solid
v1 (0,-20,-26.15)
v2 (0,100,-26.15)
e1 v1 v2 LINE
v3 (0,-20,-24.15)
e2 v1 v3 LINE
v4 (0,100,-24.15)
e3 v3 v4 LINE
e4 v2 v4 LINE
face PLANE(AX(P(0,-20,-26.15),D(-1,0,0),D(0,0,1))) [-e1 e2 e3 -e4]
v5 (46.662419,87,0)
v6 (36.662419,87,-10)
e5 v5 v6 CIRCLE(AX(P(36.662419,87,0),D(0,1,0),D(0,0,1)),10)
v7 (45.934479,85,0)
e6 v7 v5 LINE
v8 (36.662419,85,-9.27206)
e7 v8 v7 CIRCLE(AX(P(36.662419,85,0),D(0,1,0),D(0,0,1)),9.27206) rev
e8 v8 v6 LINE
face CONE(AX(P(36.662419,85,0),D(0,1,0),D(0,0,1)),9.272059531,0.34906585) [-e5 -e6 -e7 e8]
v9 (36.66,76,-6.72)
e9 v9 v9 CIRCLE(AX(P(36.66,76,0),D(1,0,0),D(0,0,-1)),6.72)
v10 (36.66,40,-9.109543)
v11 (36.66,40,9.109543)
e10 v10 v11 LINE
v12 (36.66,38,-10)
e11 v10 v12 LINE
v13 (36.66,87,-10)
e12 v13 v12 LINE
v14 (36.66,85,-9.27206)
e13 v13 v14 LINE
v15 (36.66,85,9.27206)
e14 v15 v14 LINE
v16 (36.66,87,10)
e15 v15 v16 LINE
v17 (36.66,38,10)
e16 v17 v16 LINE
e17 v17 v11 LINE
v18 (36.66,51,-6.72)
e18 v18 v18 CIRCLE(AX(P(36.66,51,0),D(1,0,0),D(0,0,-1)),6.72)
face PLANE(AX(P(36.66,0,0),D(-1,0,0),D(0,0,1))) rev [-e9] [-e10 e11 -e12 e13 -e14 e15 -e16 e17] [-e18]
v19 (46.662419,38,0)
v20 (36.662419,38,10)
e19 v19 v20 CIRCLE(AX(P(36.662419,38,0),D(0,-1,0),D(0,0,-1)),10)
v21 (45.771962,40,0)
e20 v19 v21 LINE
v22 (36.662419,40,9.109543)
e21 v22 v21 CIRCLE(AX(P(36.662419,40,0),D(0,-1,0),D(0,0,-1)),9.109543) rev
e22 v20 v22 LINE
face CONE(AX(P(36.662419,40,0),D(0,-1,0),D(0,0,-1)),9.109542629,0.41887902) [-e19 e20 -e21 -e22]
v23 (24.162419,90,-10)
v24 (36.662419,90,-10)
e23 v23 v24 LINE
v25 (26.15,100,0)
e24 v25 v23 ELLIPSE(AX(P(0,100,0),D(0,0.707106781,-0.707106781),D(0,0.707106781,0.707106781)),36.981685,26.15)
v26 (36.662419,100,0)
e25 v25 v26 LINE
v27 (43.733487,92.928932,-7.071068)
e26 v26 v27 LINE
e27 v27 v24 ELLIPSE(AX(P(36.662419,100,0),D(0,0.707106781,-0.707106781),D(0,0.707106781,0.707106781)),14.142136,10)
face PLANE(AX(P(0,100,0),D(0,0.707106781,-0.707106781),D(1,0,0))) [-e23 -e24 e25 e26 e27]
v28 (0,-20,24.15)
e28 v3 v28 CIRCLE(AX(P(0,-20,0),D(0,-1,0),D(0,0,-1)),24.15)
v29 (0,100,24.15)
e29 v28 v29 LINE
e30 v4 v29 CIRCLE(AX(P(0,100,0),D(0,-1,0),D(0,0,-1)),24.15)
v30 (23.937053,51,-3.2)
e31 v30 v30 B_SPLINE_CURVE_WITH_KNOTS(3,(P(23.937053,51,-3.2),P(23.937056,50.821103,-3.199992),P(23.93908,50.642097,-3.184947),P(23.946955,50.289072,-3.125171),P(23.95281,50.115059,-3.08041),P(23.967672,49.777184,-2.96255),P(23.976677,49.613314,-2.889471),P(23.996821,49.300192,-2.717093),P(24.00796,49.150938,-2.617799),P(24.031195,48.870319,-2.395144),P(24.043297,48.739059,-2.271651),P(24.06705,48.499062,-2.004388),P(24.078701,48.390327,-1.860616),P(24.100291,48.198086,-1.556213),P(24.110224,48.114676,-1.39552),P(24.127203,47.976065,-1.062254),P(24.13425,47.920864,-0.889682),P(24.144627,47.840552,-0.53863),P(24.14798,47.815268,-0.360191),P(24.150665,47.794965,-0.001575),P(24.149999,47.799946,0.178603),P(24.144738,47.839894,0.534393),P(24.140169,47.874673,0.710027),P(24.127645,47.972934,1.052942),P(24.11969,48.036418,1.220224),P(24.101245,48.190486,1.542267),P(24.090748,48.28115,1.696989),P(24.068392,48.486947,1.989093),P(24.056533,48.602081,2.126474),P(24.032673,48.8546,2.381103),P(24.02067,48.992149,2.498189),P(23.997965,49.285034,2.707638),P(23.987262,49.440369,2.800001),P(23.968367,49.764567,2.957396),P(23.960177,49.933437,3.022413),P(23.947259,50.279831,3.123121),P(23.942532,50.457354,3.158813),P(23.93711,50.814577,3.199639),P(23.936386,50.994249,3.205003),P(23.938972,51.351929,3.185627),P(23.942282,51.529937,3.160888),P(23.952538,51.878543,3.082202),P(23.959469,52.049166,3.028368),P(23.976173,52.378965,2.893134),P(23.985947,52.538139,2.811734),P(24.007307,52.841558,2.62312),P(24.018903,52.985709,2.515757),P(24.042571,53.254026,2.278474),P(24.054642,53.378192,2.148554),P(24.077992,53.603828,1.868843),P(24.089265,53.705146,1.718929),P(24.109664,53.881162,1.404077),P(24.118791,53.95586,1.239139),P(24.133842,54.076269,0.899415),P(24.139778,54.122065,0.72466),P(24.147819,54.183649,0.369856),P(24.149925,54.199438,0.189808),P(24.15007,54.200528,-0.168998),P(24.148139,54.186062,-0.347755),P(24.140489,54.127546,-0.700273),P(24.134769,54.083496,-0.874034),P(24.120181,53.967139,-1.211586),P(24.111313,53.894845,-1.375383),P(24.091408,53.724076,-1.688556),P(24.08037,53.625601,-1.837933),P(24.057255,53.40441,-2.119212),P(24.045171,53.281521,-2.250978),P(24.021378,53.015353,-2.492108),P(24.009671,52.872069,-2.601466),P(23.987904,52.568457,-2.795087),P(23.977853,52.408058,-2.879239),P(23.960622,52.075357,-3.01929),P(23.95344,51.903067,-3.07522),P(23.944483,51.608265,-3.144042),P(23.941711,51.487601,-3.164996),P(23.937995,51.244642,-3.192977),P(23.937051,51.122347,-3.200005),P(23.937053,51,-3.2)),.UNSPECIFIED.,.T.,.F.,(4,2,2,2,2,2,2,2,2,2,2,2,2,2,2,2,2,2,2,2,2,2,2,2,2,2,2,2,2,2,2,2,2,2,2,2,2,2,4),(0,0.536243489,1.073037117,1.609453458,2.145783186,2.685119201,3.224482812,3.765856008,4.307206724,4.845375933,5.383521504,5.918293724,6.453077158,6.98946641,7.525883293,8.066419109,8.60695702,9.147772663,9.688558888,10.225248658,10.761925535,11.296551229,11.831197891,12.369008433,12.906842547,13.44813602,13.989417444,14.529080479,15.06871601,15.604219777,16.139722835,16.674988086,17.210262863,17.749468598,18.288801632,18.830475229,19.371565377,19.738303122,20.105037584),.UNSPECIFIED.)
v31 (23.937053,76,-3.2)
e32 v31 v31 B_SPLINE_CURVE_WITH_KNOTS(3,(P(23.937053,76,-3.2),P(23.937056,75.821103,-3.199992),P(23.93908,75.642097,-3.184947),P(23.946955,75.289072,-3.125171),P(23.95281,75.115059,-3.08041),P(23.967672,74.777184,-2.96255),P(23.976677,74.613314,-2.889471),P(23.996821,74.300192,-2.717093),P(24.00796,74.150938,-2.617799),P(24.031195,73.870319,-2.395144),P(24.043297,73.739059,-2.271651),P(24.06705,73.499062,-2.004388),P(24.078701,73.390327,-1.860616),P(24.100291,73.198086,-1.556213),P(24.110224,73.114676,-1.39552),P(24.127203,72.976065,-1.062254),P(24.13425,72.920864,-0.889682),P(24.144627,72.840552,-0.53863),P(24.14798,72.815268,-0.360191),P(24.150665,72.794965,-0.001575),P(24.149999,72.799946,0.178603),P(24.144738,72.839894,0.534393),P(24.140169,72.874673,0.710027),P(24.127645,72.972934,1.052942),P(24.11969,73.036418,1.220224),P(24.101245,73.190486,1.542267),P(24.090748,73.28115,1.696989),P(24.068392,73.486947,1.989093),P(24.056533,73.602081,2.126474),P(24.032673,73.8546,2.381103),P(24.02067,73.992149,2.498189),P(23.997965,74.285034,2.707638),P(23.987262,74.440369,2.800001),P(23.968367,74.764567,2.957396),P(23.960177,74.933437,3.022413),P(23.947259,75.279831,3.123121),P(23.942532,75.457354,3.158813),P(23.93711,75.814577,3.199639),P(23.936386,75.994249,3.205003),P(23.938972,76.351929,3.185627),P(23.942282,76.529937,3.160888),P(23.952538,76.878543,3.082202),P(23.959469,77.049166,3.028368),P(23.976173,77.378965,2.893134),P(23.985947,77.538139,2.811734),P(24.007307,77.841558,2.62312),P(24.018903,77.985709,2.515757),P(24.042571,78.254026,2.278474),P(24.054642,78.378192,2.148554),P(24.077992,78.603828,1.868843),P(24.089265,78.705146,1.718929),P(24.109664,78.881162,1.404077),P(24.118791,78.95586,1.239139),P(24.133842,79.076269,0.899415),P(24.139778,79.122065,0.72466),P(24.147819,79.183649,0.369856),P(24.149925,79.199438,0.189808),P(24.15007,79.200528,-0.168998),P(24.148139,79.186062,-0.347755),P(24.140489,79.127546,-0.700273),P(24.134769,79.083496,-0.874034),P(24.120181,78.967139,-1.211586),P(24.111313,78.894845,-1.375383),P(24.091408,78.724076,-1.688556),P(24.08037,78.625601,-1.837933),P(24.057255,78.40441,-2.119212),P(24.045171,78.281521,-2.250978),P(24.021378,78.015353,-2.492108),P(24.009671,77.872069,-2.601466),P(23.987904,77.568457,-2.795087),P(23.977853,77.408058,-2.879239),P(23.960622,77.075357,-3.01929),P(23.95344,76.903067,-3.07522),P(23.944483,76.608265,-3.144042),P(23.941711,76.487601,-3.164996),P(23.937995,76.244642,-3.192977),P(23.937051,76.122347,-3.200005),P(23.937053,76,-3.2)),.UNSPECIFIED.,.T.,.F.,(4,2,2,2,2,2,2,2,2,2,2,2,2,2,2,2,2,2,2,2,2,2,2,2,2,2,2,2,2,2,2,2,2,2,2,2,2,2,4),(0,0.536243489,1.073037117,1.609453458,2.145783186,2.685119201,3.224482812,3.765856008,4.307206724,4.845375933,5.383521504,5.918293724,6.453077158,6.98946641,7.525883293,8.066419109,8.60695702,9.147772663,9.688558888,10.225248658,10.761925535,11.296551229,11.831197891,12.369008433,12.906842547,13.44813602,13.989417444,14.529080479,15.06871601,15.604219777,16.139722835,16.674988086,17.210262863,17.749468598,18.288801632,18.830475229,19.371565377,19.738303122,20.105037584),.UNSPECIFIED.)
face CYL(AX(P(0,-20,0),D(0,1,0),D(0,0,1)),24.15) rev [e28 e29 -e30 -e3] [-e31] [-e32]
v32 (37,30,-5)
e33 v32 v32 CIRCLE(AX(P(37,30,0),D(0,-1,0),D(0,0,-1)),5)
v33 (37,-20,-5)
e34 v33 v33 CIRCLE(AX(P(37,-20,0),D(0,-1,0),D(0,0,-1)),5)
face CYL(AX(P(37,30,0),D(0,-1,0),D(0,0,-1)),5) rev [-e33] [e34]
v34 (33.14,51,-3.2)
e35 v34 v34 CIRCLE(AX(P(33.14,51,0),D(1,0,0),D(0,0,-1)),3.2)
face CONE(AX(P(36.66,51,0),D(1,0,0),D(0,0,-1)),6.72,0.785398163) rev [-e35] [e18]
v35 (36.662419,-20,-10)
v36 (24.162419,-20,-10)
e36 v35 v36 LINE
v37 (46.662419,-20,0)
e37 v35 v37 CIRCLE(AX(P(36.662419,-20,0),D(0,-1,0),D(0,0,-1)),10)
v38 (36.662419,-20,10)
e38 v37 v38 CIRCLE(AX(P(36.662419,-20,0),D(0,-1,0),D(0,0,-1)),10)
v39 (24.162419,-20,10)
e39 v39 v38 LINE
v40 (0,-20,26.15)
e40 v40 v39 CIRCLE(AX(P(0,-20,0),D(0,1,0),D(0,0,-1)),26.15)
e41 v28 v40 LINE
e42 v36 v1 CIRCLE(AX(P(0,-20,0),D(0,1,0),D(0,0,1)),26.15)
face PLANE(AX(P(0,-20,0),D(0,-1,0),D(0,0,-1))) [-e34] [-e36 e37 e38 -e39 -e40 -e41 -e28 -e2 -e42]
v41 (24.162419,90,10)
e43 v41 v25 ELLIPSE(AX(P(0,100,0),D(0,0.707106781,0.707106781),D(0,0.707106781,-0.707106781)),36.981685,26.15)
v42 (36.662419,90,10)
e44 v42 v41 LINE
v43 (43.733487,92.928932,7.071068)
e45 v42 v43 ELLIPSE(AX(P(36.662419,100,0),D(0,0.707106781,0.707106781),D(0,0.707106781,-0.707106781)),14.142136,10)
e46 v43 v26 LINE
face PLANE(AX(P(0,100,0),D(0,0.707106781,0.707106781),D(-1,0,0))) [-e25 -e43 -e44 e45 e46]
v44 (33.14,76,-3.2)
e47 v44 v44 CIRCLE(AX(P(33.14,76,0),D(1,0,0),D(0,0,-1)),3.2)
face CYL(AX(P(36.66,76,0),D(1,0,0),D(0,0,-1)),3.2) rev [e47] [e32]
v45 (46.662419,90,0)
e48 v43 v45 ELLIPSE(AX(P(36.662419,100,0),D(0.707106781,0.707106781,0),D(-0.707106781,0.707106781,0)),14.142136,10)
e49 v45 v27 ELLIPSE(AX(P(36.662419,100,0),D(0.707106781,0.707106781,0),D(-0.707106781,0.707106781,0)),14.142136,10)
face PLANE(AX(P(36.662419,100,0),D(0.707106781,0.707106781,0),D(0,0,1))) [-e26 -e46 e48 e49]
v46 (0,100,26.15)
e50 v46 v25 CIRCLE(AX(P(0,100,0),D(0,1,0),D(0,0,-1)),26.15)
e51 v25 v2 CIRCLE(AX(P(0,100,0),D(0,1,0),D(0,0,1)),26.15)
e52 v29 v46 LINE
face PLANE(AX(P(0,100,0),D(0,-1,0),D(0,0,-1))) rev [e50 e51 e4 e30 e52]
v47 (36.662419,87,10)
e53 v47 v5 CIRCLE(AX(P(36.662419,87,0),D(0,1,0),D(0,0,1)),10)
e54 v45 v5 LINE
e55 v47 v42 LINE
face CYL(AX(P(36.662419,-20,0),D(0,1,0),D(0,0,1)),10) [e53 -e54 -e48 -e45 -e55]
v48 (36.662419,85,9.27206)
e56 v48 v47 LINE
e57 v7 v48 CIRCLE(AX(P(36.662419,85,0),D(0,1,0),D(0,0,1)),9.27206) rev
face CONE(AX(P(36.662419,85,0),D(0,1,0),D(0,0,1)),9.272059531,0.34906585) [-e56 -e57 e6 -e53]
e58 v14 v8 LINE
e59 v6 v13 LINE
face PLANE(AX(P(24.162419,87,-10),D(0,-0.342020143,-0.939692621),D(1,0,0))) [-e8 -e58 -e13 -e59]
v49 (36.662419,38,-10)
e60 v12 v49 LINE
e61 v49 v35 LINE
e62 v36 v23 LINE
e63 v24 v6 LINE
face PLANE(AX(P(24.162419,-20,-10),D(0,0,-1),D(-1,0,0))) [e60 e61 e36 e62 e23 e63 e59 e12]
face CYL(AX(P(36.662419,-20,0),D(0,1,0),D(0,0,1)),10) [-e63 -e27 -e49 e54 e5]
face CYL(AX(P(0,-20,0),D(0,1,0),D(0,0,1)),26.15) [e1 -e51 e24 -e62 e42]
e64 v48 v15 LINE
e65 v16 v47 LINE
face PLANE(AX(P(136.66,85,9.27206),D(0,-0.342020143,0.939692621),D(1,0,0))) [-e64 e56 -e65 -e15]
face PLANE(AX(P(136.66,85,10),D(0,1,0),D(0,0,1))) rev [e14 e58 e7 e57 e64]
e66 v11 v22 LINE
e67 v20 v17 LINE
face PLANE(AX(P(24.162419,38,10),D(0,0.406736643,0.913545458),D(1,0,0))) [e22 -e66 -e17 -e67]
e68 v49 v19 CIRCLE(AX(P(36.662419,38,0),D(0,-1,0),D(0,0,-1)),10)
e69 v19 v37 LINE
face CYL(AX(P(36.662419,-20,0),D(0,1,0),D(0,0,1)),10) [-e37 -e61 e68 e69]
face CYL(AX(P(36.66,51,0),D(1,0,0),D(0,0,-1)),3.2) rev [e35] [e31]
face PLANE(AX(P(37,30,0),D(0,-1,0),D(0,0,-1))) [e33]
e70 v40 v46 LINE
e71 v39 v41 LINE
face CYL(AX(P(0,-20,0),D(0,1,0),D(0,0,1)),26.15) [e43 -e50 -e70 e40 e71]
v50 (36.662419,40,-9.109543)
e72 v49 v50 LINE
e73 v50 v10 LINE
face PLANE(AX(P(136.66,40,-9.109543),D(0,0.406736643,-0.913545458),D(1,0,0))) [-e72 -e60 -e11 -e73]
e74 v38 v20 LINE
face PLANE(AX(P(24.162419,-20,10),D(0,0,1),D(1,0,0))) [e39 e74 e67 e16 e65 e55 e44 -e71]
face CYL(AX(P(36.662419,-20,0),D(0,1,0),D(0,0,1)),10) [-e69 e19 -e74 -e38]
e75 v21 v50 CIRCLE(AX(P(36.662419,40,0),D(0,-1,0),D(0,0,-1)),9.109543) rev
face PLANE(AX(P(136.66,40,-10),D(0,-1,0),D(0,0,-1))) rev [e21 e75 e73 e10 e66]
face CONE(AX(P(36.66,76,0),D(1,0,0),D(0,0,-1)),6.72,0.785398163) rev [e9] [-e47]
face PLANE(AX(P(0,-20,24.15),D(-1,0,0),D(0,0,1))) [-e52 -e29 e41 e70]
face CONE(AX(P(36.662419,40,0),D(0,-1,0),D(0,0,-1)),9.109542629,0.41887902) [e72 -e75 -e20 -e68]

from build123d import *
from OCP.BRepFilletAPI import BRepFilletAPI_MakeChamfer

# Parameters (mm, degrees)
DODANIE_WYCI_GNI_CIE1_DEPTH                        = 100
DODANIE_WYCI_GNI_CIE1_DEPTH_BACK                   = 20
SFAZOWANIE1_SIZE                                   = 10
ZAOKR_GLENIE1_R                                    = 10
SZKIC3_W                                           = 20
SZKIC3_H                                           = 45
WYTNIJ_WYCI_GNI_CIE1_DEPTH                         = 100
SFAZOWANIE2_SIZE                                   = 2
SFAZOWANIE2_SIZE2                                  = 0.890457371
SFAZOWANIE3_SIZE                                   = 2
SFAZOWANIE3_SIZE2                                  = 0.727940469
POG_BIENIE_STO_KOWE_POD_M6_WKR_T_Z_BEM_D           = 6.4
POG_BIENIE_STO_KOWE_POD_M6_WKR_T_Z_BEM_DEPTH       = 40
POG_BIENIE_STO_KOWE_POD_M6_WKR_T_Z_BEM_CSINK_D     = 13.44
POG_BIENIE_STO_KOWE_POD_M6_WKR_T_Z_BEM_CSINK_ANGLE = 90
POG_BIENIE_STO_KOWE_POD_M6_WKR_T_Z_BEM_TIP         = 1.922753981
SZKIC7_R                                           = 5
WYTNIJ_WYCI_GNI_CIE2_DEPTH                         = 50


with BuildPart() as part:
    # Szkic2 → Dodanie-wyciągnięcie1 (new, two sides: drawn at the far end of the back side and taken through both)
    with BuildSketch(Plane(origin=(0, 0, 0), x_dir=(1, 0, 0), z_dir=(0, 1, 0)).offset(-DODANIE_WYCI_GNI_CIE1_DEPTH_BACK)):
        with BuildLine():
            Line((24.162419167, 10), (46.662419167, 10))
            Line((46.662419167, 10), (46.662419167, -10))
            Line((46.662419167, -10), (24.162419167, -10))
            ThreePointArc((24.162419167, -10), (14.53138844, -21.740773905), (0, -26.15))
            Line((0, -26.15), (0, -24.15))
            ThreePointArc((0, -24.15), (24.15, 0), (0, 24.15))
            Line((0, 24.15), (0, 26.15))
            ThreePointArc((0, 26.15), (14.53138844, 21.740773905), (24.162419167, 10))
        make_face()
    extrude(amount=DODANIE_WYCI_GNI_CIE1_DEPTH + DODANIE_WYCI_GNI_CIE1_DEPTH_BACK)

    # Sfazowanie1
    sfazowanie1_edges = [part.edges().sort_by_distance(p)[0] for p in [
        (35.412419167, 100, 10),
        (46.662419167, 100, 0),
        (35.412419167, 100, -10),
    ]]
    chamfer(sfazowanie1_edges, length=SFAZOWANIE1_SIZE - 0.0001)  # a hair under: the kernel refuses the full size

    # Zaokrąglenie1
    zaokr_glenie1_edges = [part.edges().sort_by_distance(p)[0] for p in [
        (46.662419167, 35.00005, -10),
        (46.662419167, 35.00005, 10),
    ]]
    fillet(zaokr_glenie1_edges, radius=ZAOKR_GLENIE1_R - 0.0001)  # a hair under: the kernel refuses the full size

    # Szkic3 → Wytnij-wyciągnięcie1 (cut)
    with BuildSketch(Plane(origin=(36.66, 0, 0), x_dir=(0, 0, -1), z_dir=(1, 0, 0))):
        with Locations((0, 62.5)):
            Rectangle(SZKIC3_W, SZKIC3_H)
    extrude(amount=WYTNIJ_WYCI_GNI_CIE1_DEPTH, mode=Mode.SUBTRACT)

    # Sfazowanie2: one chamfer whose edges measure the first distance from different faces: ONE call of the kernel's chamfer builder (chamfer() names one face for all edges)
    sfazowanie2_edges_1 = [part.edges().sort_by_distance(p)[0] for p in [
        (43.733516268, 40, -7.071097101),
    ]]
    sfazowanie2_side_1 = [part.faces().sort_by_distance(p)[0] for p in [
        (43.733516268, 10, -7.071097101),
    ]]
    sfazowanie2_edges_2 = [part.edges().sort_by_distance(p)[0] for p in [
        (43.733516268, 40, 7.071097101),
    ]]
    sfazowanie2_side_2 = [part.faces().sort_by_distance(p)[0] for p in [
        (43.733516268, 10, 7.071097101),
    ]]
    sfazowanie2_edges_3 = [part.edges().sort_by_distance(p)[0] for p in [
        (36.661259583, 40, -10),
    ]]
    sfazowanie2_side_3 = [part.faces().sort_by_distance(p)[0] for p in [
        (30.411953945, 34.997782587, -10),
    ]]
    sfazowanie2_edges_4 = [part.edges().sort_by_distance(p)[0] for p in [
        (36.661259583, 40, 10),
    ]]
    sfazowanie2_side_4 = [part.faces().sort_by_distance(p)[0] for p in [
        (30.411953945, 34.997782587, 10),
    ]]
    sfazowanie2 = BRepFilletAPI_MakeChamfer(part.part.solid().wrapped)
    for e in sfazowanie2_edges_1:
        sfazowanie2.Add(SFAZOWANIE2_SIZE, SFAZOWANIE2_SIZE2, e.wrapped, sfazowanie2_side_1[0].wrapped)  # the first distance lies on this face
    for e in sfazowanie2_edges_2:
        sfazowanie2.Add(SFAZOWANIE2_SIZE, SFAZOWANIE2_SIZE2, e.wrapped, sfazowanie2_side_2[0].wrapped)  # the first distance lies on this face
    for e in sfazowanie2_edges_3:
        sfazowanie2.Add(SFAZOWANIE2_SIZE, SFAZOWANIE2_SIZE2, e.wrapped, sfazowanie2_side_3[0].wrapped)  # the first distance lies on this face
    for e in sfazowanie2_edges_4:
        sfazowanie2.Add(SFAZOWANIE2_SIZE, SFAZOWANIE2_SIZE2, e.wrapped, sfazowanie2_side_4[0].wrapped)  # the first distance lies on this face
    add(Compound.cast(sfazowanie2.Shape()), mode=Mode.REPLACE)

    # Sfazowanie3: one chamfer whose edges measure the first distance from different faces: ONE call of the kernel's chamfer builder (chamfer() names one face for all edges)
    sfazowanie3_edges_1 = [part.edges().sort_by_distance(p)[0] for p in [
        (43.733516268, 85, -7.071097101),
    ]]
    sfazowanie3_side_1 = [part.faces().sort_by_distance(p)[0] for p in [
        (43.733516268, 88.964501449, -7.071097101),
    ]]
    sfazowanie3_edges_2 = [part.edges().sort_by_distance(p)[0] for p in [
        (43.733516268, 85, 7.071097101),
    ]]
    sfazowanie3_side_2 = [part.faces().sort_by_distance(p)[0] for p in [
        (43.733516268, 88.964501449, 7.071097101),
    ]]
    sfazowanie3_edges_3 = [part.edges().sort_by_distance(p)[0] for p in [
        (36.661259583, 85, -10),
    ]]
    sfazowanie3_side_3 = [part.faces().sort_by_distance(p)[0] for p in [
        (30.411931044, 34.997767921, -10),
    ]]
    sfazowanie3_edges_4 = [part.edges().sort_by_distance(p)[0] for p in [
        (36.661259583, 85, 10),
    ]]
    sfazowanie3_side_4 = [part.faces().sort_by_distance(p)[0] for p in [
        (30.411931044, 34.997767921, 10),
    ]]
    sfazowanie3 = BRepFilletAPI_MakeChamfer(part.part.solid().wrapped)
    for e in sfazowanie3_edges_1:
        sfazowanie3.Add(SFAZOWANIE3_SIZE, SFAZOWANIE3_SIZE2, e.wrapped, sfazowanie3_side_1[0].wrapped)  # the first distance lies on this face
    for e in sfazowanie3_edges_2:
        sfazowanie3.Add(SFAZOWANIE3_SIZE, SFAZOWANIE3_SIZE2, e.wrapped, sfazowanie3_side_2[0].wrapped)  # the first distance lies on this face
    for e in sfazowanie3_edges_3:
        sfazowanie3.Add(SFAZOWANIE3_SIZE, SFAZOWANIE3_SIZE2, e.wrapped, sfazowanie3_side_3[0].wrapped)  # the first distance lies on this face
    for e in sfazowanie3_edges_4:
        sfazowanie3.Add(SFAZOWANIE3_SIZE, SFAZOWANIE3_SIZE2, e.wrapped, sfazowanie3_side_4[0].wrapped)  # the first distance lies on this face
    add(Compound.cast(sfazowanie3.Shape()), mode=Mode.REPLACE)

    # Pogłębienie stożkowe pod M6 Wkręt z łbem stożkowym płaskim2
    with Locations(Plane(origin=(36.66, 0, 0), x_dir=(0, 0, -1), z_dir=(1, 0, 0))):
        with Locations((0, 51), (0, 76)):
            CounterSinkHole(POG_BIENIE_STO_KOWE_POD_M6_WKR_T_Z_BEM_D / 2, POG_BIENIE_STO_KOWE_POD_M6_WKR_T_Z_BEM_CSINK_D / 2, depth=POG_BIENIE_STO_KOWE_POD_M6_WKR_T_Z_BEM_DEPTH, counter_sink_angle=POG_BIENIE_STO_KOWE_POD_M6_WKR_T_Z_BEM_CSINK_ANGLE)
            with Locations((0, 0, -(POG_BIENIE_STO_KOWE_POD_M6_WKR_T_Z_BEM_DEPTH + POG_BIENIE_STO_KOWE_POD_M6_WKR_T_Z_BEM_TIP / 2))):  # 118° drill point
                Cone(0, POG_BIENIE_STO_KOWE_POD_M6_WKR_T_Z_BEM_D / 2, POG_BIENIE_STO_KOWE_POD_M6_WKR_T_Z_BEM_TIP, mode=Mode.SUBTRACT)

    # Szkic7 → Wytnij-wyciągnięcie2 (cut)
    with BuildSketch(Plane.XZ.offset(20)):
        with Locations(Location((37, 0, 0), (0, 0, 270))):
            Circle(SZKIC7_R)
    extrude(amount=-WYTNIJ_WYCI_GNI_CIE2_DEPTH, mode=Mode.SUBTRACT)


solid = part.part
